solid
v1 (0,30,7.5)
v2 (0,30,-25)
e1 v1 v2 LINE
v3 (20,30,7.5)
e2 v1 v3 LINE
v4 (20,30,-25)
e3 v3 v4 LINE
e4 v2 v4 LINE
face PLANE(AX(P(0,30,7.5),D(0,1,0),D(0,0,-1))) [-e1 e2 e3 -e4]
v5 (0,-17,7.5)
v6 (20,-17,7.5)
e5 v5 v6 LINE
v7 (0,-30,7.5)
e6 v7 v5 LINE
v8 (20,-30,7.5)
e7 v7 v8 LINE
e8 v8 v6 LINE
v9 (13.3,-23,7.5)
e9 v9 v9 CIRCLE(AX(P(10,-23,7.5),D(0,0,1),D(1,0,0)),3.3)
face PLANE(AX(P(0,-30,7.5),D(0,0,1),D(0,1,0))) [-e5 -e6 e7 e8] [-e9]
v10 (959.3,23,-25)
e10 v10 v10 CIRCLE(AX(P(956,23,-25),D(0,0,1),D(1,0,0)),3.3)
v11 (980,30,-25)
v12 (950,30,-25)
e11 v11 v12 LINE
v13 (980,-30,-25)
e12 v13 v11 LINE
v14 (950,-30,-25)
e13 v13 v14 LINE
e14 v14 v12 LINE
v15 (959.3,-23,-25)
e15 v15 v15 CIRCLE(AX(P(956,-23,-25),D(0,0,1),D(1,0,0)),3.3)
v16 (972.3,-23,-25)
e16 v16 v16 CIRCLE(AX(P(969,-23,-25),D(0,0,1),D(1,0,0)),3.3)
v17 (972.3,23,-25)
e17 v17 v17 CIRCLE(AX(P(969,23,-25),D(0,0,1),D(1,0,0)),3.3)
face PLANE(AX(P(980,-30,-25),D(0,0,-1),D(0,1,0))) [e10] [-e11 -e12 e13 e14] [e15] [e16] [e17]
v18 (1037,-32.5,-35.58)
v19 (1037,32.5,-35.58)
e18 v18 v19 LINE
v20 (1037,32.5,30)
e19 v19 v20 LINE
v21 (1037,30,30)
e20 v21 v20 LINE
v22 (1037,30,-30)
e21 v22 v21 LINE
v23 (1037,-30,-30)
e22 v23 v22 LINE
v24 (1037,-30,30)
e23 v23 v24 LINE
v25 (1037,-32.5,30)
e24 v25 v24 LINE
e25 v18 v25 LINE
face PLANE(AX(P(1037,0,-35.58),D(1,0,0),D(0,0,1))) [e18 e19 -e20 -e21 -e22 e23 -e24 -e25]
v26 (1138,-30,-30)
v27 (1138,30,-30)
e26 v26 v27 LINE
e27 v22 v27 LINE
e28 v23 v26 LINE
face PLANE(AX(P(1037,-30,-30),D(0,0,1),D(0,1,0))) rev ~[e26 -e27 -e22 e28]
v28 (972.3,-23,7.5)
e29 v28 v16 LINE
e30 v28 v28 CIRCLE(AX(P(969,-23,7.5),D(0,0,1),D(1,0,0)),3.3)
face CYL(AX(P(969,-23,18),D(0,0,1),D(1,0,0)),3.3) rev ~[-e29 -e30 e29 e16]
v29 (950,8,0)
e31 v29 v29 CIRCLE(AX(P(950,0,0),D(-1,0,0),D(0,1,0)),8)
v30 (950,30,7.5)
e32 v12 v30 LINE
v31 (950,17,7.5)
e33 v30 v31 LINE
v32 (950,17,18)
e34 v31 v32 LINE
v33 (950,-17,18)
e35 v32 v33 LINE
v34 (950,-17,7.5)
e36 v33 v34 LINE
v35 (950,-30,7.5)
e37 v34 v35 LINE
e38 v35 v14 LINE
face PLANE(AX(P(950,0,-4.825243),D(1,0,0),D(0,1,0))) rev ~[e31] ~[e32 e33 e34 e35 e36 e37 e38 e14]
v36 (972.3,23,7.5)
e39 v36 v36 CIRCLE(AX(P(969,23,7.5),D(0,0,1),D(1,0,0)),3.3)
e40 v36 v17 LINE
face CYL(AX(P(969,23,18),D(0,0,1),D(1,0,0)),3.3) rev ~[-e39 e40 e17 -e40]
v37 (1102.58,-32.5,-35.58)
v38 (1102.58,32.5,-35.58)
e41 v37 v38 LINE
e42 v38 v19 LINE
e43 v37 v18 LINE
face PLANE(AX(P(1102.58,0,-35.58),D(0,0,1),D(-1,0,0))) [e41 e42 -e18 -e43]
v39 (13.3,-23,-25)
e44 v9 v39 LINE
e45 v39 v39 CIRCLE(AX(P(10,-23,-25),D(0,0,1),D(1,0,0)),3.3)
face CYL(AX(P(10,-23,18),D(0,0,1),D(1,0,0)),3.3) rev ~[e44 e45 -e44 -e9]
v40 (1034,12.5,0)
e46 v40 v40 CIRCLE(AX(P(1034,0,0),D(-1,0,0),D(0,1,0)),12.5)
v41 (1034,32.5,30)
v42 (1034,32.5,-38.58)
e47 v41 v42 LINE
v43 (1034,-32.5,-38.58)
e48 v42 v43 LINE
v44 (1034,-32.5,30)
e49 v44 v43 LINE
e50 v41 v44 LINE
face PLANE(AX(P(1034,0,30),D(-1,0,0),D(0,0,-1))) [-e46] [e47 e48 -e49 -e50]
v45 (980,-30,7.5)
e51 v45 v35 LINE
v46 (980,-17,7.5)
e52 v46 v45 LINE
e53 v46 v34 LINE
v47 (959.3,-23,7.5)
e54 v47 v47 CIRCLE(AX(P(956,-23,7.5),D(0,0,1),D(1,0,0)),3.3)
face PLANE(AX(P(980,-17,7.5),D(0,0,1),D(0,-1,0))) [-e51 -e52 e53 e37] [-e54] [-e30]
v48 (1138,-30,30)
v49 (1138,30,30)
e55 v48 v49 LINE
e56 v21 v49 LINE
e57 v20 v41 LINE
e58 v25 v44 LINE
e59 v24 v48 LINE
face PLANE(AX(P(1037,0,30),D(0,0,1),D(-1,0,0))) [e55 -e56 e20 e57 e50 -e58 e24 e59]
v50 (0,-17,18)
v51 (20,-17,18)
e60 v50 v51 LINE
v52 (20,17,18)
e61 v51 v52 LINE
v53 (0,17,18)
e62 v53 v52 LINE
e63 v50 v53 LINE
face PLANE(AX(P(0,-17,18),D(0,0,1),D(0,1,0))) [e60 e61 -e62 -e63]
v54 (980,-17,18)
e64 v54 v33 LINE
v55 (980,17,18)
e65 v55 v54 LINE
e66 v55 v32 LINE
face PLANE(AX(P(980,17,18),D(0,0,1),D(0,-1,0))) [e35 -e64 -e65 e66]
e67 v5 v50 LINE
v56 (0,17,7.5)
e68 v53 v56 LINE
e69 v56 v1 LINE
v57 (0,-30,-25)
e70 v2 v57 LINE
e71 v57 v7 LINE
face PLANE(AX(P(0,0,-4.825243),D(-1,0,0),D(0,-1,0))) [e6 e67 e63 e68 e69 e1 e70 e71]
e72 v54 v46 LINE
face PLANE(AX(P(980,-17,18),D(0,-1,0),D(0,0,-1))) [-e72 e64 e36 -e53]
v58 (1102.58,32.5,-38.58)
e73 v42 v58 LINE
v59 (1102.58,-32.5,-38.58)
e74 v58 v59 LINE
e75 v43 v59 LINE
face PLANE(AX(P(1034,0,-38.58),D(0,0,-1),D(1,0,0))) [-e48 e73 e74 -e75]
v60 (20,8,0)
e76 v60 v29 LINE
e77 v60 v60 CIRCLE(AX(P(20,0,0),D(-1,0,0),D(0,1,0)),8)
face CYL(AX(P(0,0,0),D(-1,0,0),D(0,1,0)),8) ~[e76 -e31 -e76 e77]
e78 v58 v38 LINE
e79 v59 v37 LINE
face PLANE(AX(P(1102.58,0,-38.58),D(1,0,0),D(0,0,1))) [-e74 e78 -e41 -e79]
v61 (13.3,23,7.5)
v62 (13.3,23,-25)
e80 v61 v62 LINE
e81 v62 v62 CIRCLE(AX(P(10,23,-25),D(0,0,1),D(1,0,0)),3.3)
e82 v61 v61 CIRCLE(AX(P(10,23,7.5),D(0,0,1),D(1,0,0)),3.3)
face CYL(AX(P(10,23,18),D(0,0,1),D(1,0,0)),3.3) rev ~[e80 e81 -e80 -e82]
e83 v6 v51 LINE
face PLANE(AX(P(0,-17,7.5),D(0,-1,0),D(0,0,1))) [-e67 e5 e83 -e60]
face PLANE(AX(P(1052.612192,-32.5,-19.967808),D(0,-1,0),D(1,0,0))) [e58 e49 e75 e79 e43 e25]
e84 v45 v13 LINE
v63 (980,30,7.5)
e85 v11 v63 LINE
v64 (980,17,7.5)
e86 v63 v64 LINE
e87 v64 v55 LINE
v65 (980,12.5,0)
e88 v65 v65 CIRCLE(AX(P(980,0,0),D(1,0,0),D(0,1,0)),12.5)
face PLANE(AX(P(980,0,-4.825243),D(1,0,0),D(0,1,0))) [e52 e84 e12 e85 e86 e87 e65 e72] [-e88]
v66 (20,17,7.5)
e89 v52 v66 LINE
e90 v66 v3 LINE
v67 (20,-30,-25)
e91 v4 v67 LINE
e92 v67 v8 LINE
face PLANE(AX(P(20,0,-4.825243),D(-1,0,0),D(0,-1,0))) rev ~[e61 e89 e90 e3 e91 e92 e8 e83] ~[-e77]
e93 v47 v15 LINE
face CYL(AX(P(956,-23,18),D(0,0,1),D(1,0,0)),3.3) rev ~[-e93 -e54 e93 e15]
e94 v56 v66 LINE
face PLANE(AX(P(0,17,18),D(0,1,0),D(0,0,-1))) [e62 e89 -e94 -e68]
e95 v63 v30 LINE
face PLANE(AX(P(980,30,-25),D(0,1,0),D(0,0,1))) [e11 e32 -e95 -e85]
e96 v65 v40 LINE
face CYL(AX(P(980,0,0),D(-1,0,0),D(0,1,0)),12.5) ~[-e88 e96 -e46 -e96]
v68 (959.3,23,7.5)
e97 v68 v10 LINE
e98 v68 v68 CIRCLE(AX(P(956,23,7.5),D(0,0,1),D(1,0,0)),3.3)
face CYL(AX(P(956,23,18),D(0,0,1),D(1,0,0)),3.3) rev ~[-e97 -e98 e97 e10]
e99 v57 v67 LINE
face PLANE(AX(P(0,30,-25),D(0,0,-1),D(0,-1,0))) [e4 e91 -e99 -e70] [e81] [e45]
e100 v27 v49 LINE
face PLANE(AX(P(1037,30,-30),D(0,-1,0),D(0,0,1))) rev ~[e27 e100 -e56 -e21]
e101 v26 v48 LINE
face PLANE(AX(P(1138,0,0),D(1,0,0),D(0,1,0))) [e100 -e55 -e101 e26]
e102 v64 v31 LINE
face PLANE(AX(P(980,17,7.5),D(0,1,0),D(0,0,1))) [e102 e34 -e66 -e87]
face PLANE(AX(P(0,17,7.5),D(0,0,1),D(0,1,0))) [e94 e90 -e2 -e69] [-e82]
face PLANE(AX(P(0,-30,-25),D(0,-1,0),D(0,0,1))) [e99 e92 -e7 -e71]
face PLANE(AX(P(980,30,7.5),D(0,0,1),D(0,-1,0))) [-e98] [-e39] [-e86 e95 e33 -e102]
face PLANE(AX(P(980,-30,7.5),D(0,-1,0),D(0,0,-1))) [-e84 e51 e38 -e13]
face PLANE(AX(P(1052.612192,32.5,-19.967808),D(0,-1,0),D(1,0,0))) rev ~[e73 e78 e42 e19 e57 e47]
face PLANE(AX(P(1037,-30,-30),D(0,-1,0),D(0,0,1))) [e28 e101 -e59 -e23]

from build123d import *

# Parameters (mm, degrees)
F0_R      = 8
F1_DEPTH  = 980
F3_DEPTH  = 30
F5_DEPTH  = 20
F6_R      = 12.5
F7_DEPTH  = 57
F8_R      = 3.3
F9_DEPTH  = 43.001
F10_W     = 60
F10_H     = 60
F11_DEPTH = 101
F13_DEPTH = 32.5


# Not quite as in the source:
# - a feature names something its author has since deleted; it is built from what else it names


with BuildPart() as f1:
    # F0 (on Right) → F1 (new body)
    with BuildSketch(Plane.YZ):
        Circle(F0_R)
    extrude(amount=F1_DEPTH)

    # F2 (on face) → F3 (join)
    with BuildSketch(Plane.YZ.offset(980)):
        Polygon((30, 7.5), (17, 7.5), (17, 18), (-17, 18), (-17, 7.5), (-30, 7.5), (-30, -25), (30, -25), align=None)
    extrude(amount=-F3_DEPTH)

    # F4 (on face) → F5 (join)
    with BuildSketch(Plane(origin=(0, 0, 0), x_dir=(0, -1, 0), z_dir=(-1, 0, 0))):
        Polygon((17, 7.5), (17, 18), (-17, 18), (-17, 7.5), (-30, 7.5), (-30, -25), (30, -25), (30, 7.5), align=None)
    extrude(amount=-F5_DEPTH)

    # F6 (on face) → F7 (join)
    with BuildSketch(Plane.YZ.offset(980)):
        Circle(F6_R)
    extrude(amount=F7_DEPTH)

    # F8 (on face) → F9 (cut, through all)
    with BuildSketch(Plane.XY.offset(18)):
        with Locations((956, 23)):
            Circle(F8_R)
        with Locations((969, 23)):
            Circle(F8_R)
        with Locations((956, -23)):
            Circle(F8_R)
        with Locations((969, -23)):
            Circle(F8_R)
        with Locations((10, 23)):
            Circle(F8_R)
        with Locations((10, -23)):
            Circle(F8_R)
    extrude(amount=-F9_DEPTH, mode=Mode.SUBTRACT)

    # F10 (on face) → F11 (join)
    with BuildSketch(Plane.YZ.offset(1037)):
        Rectangle(F10_W, F10_H)
    extrude(amount=F11_DEPTH)

    # F12 (on Front) → F13 (join, symmetric)
    with BuildSketch(Plane.XZ):
        Polygon((1037, 30), (1034, 30), (1034, -38.58), (1102.58, -38.58), (1102.58, -35.58), (1037, -35.58), align=None)
    extrude(amount=F13_DEPTH, both=True)


solid = f1.part
